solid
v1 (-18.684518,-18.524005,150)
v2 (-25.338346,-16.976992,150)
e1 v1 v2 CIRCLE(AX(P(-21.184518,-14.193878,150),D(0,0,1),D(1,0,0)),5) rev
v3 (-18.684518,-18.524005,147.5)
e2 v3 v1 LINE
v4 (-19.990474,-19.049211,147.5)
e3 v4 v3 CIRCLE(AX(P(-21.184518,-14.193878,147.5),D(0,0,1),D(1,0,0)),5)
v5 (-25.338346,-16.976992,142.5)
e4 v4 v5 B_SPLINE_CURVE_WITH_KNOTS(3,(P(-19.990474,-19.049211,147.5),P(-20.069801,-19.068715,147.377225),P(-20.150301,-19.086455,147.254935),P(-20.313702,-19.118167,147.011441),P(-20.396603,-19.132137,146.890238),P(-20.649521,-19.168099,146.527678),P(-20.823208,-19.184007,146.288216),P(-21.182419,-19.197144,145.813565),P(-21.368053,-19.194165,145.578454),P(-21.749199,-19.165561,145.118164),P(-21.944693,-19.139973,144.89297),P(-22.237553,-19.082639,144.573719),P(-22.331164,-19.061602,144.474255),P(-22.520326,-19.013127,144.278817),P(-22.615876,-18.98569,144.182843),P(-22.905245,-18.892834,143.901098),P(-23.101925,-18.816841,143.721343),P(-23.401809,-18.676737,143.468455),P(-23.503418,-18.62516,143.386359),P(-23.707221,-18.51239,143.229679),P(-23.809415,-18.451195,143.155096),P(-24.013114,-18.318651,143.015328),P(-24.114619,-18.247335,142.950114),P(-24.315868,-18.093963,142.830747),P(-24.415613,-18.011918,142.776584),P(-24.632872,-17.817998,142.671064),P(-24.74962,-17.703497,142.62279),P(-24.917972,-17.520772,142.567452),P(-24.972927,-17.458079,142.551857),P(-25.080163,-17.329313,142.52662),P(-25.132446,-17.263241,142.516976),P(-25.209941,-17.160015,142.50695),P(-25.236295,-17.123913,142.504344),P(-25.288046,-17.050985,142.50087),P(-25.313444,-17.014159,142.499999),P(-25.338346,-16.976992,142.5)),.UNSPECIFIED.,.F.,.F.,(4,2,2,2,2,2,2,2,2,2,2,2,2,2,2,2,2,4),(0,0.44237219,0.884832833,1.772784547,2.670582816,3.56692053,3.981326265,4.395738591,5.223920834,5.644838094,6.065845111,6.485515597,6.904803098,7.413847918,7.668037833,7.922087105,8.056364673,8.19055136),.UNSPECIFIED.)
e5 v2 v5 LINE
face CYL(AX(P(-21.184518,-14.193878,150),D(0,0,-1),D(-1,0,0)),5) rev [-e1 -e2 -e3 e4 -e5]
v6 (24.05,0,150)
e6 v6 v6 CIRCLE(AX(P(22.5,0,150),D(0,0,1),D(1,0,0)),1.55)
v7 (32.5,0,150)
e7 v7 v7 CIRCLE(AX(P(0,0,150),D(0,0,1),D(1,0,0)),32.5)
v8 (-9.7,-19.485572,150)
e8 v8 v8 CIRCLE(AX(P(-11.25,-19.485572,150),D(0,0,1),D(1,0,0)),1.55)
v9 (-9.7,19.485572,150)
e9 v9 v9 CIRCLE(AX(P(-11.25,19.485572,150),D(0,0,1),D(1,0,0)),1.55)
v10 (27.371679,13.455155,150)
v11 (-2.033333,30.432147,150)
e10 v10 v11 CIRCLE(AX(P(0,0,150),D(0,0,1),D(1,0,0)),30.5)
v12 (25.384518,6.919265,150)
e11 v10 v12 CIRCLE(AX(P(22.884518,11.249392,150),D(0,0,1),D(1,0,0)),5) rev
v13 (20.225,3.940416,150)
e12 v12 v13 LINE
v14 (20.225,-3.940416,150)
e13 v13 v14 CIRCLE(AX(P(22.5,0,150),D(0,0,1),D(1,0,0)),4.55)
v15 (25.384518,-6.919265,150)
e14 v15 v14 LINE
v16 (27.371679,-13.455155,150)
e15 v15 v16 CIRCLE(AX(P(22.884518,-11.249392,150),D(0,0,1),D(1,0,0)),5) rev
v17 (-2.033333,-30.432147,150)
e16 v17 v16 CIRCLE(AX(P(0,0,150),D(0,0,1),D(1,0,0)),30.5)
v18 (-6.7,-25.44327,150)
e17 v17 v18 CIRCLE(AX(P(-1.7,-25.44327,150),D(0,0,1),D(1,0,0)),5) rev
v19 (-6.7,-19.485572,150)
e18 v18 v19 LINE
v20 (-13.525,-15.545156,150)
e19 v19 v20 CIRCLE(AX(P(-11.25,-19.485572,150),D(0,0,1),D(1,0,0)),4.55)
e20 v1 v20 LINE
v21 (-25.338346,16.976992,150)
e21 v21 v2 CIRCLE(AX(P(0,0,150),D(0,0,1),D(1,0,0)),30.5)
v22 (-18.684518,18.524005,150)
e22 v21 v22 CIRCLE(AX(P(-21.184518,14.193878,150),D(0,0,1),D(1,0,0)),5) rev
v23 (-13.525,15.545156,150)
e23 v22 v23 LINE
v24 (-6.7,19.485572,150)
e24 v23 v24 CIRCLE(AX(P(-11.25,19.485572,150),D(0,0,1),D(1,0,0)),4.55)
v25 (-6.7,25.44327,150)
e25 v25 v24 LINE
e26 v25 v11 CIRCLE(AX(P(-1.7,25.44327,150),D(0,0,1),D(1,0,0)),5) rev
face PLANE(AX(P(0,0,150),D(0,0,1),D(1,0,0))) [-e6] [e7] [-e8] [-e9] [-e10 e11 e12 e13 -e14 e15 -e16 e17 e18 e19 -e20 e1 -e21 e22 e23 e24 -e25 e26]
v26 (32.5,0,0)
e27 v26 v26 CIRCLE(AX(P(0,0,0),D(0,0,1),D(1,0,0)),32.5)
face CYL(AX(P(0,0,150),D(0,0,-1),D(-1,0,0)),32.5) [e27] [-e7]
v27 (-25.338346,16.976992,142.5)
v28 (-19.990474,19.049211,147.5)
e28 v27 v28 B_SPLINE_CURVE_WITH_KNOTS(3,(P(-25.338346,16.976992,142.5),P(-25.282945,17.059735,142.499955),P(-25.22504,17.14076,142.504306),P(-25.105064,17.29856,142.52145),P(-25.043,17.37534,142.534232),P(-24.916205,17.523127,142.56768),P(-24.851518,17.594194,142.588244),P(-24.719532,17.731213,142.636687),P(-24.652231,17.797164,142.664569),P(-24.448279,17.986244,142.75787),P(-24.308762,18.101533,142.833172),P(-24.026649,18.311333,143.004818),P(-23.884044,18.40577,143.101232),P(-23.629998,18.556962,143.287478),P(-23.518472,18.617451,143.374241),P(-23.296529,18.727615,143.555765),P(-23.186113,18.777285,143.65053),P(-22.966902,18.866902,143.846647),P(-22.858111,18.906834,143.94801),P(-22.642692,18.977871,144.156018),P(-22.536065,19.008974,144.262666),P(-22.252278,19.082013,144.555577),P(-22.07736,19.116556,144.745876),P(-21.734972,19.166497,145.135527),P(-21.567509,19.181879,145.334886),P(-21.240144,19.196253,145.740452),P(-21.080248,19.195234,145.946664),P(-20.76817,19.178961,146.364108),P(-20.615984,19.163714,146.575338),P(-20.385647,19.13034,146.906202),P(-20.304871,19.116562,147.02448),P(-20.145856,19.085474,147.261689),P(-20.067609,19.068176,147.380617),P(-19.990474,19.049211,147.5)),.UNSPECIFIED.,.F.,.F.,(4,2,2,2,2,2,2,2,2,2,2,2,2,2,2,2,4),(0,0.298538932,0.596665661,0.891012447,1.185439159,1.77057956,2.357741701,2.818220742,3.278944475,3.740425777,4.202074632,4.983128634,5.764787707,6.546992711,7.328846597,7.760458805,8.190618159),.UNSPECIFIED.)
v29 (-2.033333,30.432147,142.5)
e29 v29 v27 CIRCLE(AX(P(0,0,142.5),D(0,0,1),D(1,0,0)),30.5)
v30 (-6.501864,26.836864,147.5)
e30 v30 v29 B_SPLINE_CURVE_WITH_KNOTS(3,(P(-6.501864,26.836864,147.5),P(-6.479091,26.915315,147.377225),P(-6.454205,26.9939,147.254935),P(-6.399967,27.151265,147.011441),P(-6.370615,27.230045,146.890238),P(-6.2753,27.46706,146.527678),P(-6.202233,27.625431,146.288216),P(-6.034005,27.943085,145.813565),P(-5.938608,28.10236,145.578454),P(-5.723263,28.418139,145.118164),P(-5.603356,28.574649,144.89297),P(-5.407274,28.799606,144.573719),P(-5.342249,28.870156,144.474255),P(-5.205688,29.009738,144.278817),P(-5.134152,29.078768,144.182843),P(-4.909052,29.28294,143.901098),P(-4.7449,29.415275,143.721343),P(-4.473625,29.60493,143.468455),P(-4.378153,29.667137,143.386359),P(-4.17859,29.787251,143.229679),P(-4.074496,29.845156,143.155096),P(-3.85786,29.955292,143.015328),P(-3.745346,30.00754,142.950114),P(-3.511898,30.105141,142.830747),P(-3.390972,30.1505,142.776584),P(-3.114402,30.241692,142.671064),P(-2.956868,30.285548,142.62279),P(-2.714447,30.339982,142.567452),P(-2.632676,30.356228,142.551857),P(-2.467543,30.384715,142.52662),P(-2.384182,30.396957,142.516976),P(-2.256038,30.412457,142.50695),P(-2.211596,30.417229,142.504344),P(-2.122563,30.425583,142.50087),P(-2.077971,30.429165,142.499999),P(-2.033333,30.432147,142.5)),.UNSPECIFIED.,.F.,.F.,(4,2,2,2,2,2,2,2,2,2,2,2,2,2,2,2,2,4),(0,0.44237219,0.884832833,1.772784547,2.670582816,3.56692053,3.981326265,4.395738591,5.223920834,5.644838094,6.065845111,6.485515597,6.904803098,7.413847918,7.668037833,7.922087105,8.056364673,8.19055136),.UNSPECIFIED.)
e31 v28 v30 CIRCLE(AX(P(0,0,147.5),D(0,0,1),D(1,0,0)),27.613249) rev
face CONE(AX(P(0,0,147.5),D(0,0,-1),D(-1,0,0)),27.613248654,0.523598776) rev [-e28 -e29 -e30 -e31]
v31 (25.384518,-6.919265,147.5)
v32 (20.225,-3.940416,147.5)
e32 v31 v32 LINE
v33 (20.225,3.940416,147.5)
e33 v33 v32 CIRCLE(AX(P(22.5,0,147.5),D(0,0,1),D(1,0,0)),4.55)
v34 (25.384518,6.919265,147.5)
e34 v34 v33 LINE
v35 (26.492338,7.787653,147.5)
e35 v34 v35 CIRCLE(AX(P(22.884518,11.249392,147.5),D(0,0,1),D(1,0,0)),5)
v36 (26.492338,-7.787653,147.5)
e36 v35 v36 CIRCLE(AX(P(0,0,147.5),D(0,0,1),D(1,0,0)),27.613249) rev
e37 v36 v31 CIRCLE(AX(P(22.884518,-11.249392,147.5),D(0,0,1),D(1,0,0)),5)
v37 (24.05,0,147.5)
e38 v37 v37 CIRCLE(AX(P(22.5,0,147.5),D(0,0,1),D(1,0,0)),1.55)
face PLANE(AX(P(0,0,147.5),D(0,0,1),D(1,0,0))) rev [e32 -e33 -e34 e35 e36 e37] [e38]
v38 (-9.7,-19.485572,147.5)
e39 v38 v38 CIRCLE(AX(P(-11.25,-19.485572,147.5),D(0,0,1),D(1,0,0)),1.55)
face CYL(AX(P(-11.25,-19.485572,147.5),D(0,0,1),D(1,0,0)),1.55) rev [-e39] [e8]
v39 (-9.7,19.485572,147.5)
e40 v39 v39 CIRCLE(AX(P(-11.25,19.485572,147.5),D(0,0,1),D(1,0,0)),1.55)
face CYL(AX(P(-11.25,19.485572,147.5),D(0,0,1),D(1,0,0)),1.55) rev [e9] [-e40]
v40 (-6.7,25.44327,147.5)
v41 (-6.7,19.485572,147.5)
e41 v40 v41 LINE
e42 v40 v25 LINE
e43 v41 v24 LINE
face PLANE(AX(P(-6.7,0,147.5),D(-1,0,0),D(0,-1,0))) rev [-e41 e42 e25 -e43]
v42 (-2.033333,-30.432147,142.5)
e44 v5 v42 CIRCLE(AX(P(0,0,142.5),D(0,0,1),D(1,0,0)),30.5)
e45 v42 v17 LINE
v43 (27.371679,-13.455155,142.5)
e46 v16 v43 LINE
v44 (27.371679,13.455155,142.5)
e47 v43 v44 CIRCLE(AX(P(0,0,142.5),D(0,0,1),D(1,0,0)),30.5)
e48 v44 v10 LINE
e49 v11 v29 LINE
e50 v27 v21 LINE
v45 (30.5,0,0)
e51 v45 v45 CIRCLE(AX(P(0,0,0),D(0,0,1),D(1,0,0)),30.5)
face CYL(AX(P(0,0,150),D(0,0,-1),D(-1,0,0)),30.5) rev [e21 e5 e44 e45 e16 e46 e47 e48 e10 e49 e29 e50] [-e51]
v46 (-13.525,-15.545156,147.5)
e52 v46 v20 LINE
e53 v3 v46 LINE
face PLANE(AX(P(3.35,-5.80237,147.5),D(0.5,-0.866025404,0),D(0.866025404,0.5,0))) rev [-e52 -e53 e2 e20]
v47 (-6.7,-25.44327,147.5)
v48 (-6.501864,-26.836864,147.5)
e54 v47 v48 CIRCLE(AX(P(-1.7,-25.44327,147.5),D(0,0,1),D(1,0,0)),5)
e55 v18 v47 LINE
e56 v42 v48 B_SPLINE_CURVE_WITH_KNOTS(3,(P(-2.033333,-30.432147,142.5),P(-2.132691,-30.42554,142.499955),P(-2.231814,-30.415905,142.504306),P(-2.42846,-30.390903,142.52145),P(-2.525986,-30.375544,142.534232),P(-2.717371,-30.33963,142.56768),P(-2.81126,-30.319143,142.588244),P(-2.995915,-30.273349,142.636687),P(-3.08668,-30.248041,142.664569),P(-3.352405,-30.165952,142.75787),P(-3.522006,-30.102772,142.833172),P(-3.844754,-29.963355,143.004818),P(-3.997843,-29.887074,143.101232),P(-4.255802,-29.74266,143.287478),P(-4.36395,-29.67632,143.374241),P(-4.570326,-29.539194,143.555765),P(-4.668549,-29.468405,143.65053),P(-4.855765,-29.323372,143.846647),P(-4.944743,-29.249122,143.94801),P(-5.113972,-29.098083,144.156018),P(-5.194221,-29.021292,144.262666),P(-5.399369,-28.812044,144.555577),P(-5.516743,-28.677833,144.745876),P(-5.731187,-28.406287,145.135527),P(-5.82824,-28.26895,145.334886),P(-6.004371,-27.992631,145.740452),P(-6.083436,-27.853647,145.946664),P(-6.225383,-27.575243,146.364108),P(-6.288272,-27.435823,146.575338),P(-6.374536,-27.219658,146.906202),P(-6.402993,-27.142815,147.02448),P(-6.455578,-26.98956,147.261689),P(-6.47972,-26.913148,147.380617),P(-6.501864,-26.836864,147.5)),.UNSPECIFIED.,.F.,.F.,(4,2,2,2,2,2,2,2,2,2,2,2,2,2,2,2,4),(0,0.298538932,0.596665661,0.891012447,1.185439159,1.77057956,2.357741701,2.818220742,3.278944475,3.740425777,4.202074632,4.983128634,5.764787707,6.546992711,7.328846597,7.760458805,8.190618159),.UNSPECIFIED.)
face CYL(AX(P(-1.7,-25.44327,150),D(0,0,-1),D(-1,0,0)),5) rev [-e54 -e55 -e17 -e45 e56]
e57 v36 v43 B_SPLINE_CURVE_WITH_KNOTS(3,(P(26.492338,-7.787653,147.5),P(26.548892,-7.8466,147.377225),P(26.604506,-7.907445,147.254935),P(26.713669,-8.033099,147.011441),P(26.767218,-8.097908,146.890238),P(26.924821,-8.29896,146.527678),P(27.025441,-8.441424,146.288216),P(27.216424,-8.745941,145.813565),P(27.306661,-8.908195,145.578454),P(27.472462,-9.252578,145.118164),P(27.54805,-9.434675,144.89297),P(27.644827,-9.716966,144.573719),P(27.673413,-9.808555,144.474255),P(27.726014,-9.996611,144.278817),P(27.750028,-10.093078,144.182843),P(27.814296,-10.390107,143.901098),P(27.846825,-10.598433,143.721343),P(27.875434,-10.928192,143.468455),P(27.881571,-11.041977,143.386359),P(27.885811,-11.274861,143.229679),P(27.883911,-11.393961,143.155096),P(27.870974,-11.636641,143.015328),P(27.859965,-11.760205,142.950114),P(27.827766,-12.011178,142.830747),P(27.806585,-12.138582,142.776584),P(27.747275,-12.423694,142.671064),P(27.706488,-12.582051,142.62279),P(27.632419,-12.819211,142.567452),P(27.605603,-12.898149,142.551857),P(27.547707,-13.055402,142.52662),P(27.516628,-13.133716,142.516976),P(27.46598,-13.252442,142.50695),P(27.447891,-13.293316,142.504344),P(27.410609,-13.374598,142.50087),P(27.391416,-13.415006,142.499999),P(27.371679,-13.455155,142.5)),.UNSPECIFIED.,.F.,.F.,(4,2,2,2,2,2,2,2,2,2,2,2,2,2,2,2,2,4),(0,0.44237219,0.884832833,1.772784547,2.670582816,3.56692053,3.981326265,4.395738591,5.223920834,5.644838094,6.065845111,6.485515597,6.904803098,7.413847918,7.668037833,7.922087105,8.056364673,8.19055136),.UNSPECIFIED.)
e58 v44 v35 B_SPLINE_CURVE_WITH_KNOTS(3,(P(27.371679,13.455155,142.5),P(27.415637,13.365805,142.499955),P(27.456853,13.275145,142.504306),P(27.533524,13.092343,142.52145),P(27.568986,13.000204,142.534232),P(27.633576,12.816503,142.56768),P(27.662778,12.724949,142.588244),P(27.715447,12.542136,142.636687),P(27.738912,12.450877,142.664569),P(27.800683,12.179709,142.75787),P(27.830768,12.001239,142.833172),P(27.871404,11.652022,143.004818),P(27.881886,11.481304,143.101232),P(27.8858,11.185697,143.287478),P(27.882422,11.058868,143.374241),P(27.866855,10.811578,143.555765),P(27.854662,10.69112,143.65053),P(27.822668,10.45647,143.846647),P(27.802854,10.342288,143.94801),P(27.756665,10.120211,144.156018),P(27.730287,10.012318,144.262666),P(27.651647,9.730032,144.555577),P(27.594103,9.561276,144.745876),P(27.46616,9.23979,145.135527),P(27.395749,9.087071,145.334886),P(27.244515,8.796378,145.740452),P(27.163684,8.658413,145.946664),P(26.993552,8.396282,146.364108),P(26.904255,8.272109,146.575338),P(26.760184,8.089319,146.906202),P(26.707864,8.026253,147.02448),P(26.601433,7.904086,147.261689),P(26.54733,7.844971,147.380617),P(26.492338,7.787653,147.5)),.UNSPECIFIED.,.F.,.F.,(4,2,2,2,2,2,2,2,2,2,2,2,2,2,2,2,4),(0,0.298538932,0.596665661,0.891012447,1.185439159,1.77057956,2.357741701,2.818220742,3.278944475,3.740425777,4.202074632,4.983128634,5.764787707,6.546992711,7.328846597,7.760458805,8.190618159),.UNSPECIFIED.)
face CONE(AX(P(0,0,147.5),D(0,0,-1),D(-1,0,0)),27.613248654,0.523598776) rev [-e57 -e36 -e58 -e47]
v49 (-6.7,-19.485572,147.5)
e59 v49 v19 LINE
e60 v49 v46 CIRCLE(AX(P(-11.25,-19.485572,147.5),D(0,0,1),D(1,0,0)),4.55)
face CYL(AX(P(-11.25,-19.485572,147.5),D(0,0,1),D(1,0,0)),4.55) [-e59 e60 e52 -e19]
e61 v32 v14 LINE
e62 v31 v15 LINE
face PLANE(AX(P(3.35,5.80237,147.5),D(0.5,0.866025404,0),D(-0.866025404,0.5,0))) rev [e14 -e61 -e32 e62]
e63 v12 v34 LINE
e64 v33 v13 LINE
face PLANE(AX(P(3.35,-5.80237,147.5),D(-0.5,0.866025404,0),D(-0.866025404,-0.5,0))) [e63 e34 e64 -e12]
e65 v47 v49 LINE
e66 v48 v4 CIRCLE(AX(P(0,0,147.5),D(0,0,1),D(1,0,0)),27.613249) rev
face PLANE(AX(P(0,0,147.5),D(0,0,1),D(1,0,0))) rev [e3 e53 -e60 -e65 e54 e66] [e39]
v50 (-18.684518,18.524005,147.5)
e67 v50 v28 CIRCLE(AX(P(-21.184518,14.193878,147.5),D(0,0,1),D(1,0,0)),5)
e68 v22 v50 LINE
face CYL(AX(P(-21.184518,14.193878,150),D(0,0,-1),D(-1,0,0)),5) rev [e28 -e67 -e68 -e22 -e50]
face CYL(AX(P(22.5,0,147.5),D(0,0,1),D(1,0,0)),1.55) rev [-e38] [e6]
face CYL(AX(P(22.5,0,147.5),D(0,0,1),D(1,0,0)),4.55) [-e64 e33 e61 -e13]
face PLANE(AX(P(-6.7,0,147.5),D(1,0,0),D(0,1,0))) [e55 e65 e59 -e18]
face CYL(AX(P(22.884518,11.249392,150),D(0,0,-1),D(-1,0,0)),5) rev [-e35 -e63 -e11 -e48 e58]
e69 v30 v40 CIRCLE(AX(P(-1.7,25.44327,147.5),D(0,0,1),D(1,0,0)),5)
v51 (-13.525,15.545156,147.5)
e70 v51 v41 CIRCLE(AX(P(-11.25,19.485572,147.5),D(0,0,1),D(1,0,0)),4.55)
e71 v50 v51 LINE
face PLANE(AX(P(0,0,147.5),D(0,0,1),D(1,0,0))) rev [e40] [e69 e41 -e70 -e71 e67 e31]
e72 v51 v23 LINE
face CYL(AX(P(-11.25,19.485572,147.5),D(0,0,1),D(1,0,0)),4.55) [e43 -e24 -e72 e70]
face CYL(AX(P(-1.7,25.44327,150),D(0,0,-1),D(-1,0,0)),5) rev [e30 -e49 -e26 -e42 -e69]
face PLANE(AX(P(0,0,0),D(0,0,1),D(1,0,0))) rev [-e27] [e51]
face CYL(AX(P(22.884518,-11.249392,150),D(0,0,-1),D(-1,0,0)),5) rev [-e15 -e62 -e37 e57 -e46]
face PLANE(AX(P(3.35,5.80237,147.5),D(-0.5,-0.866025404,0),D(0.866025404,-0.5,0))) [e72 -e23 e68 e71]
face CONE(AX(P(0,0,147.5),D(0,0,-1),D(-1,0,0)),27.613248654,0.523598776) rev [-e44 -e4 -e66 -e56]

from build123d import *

# Parameters (mm, degrees)
SKETCH1_R           = 32.5
SKETCH1_R_2         = 30.5
BOSS_EXTRUDE1_DEPTH = 150
BOSS_EXTRUDE2_START = -2.5
SKETCH2_R           = 1.55
BOSS_EXTRUDE2_DEPTH = 2.5
FILLET1_R           = 5
CHAMFER1_START      = 142.49999956
CHAMFER1_DEPTH      = 5.00000044
CHAMFER1_START_2    = 142.499980406
CHAMFER1_3_DEPTH    = 5.000019594


with BuildPart() as part:
    # Sketch1 → Boss-Extrude1 (new body)
    with BuildSketch(Plane.XY):
        Circle(SKETCH1_R)
        Circle(SKETCH1_R_2, mode=Mode.SUBTRACT)
    extrude(amount=BOSS_EXTRUDE1_DEPTH)

    # Sketch2 → Boss-Extrude2 (add)
    # profile 1 of 3: a face of its own
    with BuildSketch(Plane.XY.offset(150).offset(BOSS_EXTRUDE2_START)):
        with BuildLine():
            Line((20.225, -3.940415587), (29.118585526, -9.075129585))
            ThreePointArc((29.118585526, -9.075129585), (30.152668692, -4.58983341), (30.5, 0))
            ThreePointArc((30.5, 0), (30.152668692, 4.58983341), (29.118585526, 9.075129585))
            Line((29.118585526, 9.075129585), (20.225, 3.940415587))
            ThreePointArc((20.225, 3.940415587), (17.95, 0), (20.225, -3.940415587))
        make_face()
        with Locations((22.5, 0)):
            Circle(SKETCH2_R, mode=Mode.SUBTRACT)
    # profile 2 of 3: a face of its own
    with BuildSketch(Plane.XY.offset(150).offset(BOSS_EXTRUDE2_START)):
        with BuildLine():
            ThreePointArc((-6.7, 29.75499958), (-15.25, 26.413774815), (-22.418585526, 20.679869995))
            Line((-22.418585526, 20.679869995), (-13.525, 15.545155998))
            ThreePointArc((-13.525, 15.545155998), (-8.975, 15.545155998), (-6.7, 19.485571585))
            Line((-6.7, 19.485571585), (-6.7, 29.75499958))
        make_face()
        with Locations((-11.25, 19.485571585)):
            Circle(SKETCH2_R, mode=Mode.SUBTRACT)
    # profile 3 of 3: a face of its own
    with BuildSketch(Plane.XY.offset(150).offset(BOSS_EXTRUDE2_START)):
        with BuildLine():
            ThreePointArc((-22.418585526, -20.679869995), (-15.25, -26.413774815), (-6.7, -29.75499958))
            Line((-6.7, -29.75499958), (-6.7, -19.485571585))
            ThreePointArc((-6.7, -19.485571585), (-8.975, -15.545155998), (-13.525, -15.545155998))
            Line((-13.525, -15.545155998), (-22.418585526, -20.679869995))
        make_face()
        with Locations((-11.25, -19.485571585)):
            Circle(SKETCH2_R, mode=Mode.SUBTRACT)
    extrude(amount=BOSS_EXTRUDE2_DEPTH)

    # Fillet1
    fillet1_edges = [part.edges().sort_by_distance(p)[0] for p in [
        (29.118585526, 9.075129585, 148.75),
        (29.118585526, -9.075129585, 148.75),
        (-22.418585526, 20.679869995, 148.75),
        (-6.7, 29.75499958, 148.75),
        (-6.7, -29.75499958, 148.75),
        (-22.418585526, -20.679869995, 148.75),
    ]]
    fillet(fillet1_edges, radius=FILLET1_R)

    # Chamfer1: read off the stored shape, not the designer's step
    # Chamfer1 outline → Chamfer1 (add)
    with BuildSketch(Plane.XY.offset(CHAMFER1_START)):
        with BuildLine():
            ThreePointArc((27.37167884, -13.455155052), (30.5, 0), (27.37167884, 13.455155052))
            ThreePointArc((27.37167884, 13.455155052), (15.25, 26.413774815), (-2.033333333, 30.432146746))
            ThreePointArc((-2.033333333, 30.432146746), (-15.25, 26.413774816), (-25.338345507, 16.976991694))
            ThreePointArc((-25.338345507, 16.976991694), (-30.5, 0), (-25.338345507, -16.976991694))
            ThreePointArc((-25.338345507, -16.976991694), (-15.25, -26.413774816), (-2.033333333, -30.432146746))
            ThreePointArc((-2.033333333, -30.432146746), (15.25, -26.413774815), (27.37167884, -13.455155052))
        make_face()
    extrude(amount=CHAMFER1_DEPTH)

    # Chamfer1 2 outline → Chamfer1 2 (revolve, cut)
    with BuildSketch(Plane.XZ):
        Polygon((0, 142.499980406), (30.500011313, 142.499980406), (27.613248654, 147.5), (0, 147.5), align=None)
    revolve(axis=Axis((0, 0, 0), (0, 0, 1)), mode=Mode.SUBTRACT)

    # Chamfer1 3 outline → Chamfer1 3 (cut)
    with BuildSketch(Plane.XY.offset(CHAMFER1_START_2)):
        with BuildLine():
            ThreePointArc((-2.033333333, 30.432146746), (-4.834338384, 29.33889892), (-6.501863856, 26.836863968))
            ThreePointArc((-6.501863856, 26.836863968), (13.806624327, 23.913774815), (26.492337882, 7.787652712))
            ThreePointArc((26.492337882, 7.787652712), (27.825400976, 10.482789609), (27.37167884, 13.455155052))
            ThreePointArc((27.37167884, 13.455155052), (15.25, 26.413774815), (-2.033333333, 30.432146746))
        make_face()
        with BuildLine():
            ThreePointArc((26.492337882, -7.787652712), (13.806624327, -23.913774815), (-6.501863856, -26.836863968))
            ThreePointArc((-6.501863856, -26.836863968), (-4.834338384, -29.33889892), (-2.033333333, -30.432146746))
            ThreePointArc((-2.033333333, -30.432146746), (15.25, -26.413774815), (27.37167884, -13.455155052))
            ThreePointArc((27.37167884, -13.455155052), (27.825400976, -10.482789609), (26.492337882, -7.787652712))
        make_face()
        with BuildLine():
            ThreePointArc((-25.338345507, 16.976991694), (-30.5, 0), (-25.338345507, -16.976991694))
            ThreePointArc((-25.338345507, -16.976991694), (-22.991062592, -18.856109312), (-19.990474026, -19.049211255))
            ThreePointArc((-19.990474026, -19.049211255), (-27.613248654, 0), (-19.990474026, 19.049211255))
            ThreePointArc((-19.990474026, 19.049211255), (-22.991062592, 18.856109311), (-25.338345507, 16.976991694))
        make_face()
    extrude(amount=CHAMFER1_3_DEPTH, mode=Mode.SUBTRACT)


solid = part.part
